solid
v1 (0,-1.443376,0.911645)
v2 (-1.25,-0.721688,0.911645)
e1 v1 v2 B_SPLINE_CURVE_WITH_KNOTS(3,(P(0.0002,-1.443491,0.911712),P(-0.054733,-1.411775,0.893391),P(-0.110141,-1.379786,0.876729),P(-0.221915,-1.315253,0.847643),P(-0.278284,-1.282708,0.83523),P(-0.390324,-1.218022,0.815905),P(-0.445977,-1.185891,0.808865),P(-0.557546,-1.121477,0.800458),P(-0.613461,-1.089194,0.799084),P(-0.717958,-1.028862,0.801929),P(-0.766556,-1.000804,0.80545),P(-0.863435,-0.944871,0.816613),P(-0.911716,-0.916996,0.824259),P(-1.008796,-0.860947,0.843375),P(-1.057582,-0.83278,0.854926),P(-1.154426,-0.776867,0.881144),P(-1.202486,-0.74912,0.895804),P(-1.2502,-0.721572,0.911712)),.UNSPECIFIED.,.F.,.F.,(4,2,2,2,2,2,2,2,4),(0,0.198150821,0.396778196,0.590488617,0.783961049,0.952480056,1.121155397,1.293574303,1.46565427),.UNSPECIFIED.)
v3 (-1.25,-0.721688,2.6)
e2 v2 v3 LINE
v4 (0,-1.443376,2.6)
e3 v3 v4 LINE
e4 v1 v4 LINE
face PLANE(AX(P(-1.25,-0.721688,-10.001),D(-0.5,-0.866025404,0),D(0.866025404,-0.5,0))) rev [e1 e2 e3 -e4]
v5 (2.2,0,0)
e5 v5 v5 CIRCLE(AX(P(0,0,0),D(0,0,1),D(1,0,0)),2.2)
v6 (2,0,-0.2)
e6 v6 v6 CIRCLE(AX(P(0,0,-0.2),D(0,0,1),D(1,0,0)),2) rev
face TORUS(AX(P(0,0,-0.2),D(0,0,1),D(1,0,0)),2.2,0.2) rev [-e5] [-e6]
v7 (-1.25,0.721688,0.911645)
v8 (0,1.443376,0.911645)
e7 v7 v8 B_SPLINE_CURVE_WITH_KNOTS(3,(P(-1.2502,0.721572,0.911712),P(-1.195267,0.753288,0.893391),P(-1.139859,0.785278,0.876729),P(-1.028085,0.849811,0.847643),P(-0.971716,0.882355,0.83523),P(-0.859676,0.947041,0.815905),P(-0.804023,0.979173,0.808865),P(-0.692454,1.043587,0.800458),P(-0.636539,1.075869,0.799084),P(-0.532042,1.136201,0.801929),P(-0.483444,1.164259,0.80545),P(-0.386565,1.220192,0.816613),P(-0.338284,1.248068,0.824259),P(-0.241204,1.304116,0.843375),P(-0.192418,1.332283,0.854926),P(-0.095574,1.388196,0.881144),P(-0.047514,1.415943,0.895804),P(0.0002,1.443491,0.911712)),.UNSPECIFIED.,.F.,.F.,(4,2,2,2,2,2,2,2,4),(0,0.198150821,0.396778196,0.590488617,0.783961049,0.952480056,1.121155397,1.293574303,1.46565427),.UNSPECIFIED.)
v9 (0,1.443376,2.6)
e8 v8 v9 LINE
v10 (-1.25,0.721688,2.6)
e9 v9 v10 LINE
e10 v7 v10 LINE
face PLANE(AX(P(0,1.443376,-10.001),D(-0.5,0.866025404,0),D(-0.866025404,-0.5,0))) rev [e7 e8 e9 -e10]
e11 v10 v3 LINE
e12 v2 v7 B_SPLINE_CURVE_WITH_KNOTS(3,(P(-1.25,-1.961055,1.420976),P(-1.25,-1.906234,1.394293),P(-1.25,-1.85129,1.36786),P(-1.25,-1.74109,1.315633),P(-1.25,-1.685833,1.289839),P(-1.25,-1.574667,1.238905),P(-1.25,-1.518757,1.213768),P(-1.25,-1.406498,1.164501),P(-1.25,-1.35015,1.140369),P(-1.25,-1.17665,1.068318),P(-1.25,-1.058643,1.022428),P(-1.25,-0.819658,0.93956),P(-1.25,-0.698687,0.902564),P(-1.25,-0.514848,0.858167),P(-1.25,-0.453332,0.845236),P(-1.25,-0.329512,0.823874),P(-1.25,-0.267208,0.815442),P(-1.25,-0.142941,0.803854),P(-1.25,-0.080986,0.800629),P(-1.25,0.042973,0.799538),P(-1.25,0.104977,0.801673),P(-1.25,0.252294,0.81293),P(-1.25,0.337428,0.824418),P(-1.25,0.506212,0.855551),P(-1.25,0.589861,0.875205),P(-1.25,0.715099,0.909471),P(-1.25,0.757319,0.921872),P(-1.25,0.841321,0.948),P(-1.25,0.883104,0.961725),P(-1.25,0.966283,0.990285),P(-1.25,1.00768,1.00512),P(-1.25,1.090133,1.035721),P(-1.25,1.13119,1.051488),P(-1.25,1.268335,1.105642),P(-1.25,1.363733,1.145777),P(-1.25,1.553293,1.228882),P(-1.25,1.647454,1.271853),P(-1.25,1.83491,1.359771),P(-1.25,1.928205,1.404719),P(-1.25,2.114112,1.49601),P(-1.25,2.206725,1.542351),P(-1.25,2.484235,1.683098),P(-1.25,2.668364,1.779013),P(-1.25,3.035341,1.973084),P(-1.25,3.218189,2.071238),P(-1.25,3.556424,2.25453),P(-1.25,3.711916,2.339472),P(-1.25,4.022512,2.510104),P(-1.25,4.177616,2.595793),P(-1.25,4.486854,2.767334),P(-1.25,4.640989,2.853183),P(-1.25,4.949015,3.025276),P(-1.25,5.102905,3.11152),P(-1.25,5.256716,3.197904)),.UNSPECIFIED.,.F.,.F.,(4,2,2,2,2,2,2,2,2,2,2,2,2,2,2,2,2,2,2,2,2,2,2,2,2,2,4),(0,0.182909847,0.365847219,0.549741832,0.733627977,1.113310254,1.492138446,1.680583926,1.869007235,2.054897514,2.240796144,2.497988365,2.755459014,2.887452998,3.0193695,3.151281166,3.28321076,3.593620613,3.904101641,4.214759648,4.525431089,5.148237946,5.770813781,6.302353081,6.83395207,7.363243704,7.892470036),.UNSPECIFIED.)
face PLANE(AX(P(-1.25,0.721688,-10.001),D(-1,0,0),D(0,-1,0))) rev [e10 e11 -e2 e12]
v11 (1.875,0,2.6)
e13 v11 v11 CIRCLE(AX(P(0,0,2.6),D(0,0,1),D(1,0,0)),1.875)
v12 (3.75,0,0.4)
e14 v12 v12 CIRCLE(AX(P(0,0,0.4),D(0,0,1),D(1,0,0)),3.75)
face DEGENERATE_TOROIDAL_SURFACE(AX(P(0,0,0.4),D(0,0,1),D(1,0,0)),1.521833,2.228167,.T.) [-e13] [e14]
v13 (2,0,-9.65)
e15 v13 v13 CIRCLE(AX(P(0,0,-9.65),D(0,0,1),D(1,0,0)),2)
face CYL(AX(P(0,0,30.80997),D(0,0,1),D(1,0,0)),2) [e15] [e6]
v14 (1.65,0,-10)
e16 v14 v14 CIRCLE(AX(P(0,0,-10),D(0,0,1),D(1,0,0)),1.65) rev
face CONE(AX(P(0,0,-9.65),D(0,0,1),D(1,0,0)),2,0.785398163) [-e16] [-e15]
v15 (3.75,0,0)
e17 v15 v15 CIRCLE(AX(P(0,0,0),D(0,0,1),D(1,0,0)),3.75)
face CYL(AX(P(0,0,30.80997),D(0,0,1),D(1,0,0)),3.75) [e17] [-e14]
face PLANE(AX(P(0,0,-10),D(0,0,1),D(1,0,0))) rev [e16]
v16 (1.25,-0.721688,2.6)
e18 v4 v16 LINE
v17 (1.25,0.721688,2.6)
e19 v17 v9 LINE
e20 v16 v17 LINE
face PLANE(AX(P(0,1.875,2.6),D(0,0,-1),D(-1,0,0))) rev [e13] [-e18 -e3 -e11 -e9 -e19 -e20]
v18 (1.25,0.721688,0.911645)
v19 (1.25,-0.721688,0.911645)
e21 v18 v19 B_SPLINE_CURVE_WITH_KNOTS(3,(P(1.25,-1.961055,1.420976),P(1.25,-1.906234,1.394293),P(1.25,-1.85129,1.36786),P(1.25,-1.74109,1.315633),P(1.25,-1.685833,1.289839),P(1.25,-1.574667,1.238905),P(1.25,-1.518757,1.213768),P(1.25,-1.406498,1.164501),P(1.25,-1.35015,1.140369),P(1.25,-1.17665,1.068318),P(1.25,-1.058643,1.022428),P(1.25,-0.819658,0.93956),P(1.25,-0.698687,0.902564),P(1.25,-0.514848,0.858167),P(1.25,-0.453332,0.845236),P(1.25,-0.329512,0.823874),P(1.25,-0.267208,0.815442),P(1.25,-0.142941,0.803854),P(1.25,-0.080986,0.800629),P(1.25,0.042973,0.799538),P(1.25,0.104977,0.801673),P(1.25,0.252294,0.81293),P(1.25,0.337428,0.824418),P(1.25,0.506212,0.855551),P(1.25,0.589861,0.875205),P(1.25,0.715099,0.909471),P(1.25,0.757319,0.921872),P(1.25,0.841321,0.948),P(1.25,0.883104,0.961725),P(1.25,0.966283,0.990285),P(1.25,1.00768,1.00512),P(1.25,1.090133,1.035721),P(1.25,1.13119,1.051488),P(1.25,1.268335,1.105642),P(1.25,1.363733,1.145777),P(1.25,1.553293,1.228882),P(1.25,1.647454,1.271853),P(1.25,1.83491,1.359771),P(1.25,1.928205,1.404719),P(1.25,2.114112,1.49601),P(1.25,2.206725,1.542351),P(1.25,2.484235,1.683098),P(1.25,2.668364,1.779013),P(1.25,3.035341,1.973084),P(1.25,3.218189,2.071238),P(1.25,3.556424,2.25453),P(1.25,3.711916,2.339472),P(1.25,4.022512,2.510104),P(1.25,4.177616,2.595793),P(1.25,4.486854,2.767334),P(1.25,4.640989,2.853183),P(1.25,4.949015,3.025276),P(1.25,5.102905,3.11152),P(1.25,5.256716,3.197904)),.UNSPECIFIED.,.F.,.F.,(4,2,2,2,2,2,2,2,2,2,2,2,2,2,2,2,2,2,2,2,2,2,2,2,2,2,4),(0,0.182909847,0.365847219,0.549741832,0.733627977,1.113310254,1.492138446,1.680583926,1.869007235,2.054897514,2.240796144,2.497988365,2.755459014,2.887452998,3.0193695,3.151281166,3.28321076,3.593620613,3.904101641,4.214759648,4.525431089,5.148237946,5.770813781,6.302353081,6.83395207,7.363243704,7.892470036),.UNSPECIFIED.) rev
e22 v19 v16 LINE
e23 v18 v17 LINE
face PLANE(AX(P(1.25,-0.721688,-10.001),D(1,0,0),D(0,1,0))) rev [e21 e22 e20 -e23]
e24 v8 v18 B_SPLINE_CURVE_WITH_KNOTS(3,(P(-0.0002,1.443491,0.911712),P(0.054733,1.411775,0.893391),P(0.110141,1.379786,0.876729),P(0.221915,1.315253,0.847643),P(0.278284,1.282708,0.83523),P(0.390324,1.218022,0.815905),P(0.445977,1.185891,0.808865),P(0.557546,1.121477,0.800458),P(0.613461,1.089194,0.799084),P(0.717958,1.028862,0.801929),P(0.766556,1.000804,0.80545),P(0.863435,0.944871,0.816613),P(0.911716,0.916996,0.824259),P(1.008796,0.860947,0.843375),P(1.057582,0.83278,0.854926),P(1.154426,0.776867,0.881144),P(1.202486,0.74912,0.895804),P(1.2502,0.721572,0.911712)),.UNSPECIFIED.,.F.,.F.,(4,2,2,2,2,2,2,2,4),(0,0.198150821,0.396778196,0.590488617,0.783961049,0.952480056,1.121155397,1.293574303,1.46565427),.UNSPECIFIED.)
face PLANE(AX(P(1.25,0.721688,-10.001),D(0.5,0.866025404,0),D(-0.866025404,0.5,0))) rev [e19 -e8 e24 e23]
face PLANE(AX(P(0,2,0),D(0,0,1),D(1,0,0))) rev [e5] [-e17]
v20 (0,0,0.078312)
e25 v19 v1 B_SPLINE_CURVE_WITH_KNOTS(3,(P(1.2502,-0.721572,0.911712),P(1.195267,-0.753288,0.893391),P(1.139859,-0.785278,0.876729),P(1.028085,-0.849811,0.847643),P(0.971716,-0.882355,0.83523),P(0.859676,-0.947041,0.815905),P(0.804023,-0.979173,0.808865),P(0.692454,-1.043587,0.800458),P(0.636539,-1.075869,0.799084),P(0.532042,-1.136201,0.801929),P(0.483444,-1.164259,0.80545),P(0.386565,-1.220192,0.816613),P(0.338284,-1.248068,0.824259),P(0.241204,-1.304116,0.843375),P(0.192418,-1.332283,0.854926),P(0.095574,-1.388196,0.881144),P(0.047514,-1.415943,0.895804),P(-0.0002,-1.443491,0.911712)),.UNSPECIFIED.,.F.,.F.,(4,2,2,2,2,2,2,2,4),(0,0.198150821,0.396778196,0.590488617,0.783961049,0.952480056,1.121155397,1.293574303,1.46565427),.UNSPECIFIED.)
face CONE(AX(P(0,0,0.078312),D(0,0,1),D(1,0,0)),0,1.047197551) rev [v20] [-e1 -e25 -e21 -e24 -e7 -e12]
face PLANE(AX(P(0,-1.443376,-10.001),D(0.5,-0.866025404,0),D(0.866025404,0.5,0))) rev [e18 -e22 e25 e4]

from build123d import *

# Parameters (mm, degrees)
CHAMFER1_SIZE      = 0.35
CUT_EXTRUDE1_START = -1.8000001
CUT_EXTRUDE1_DEPTH = 2.8000001
FILLET1_R          = 0.2


with BuildPart() as part:
    # Sketch1 → Revolve1 (revolve)
    with BuildSketch(Plane(origin=(0, 0, 0), x_dir=(0, 0, -1), z_dir=(1, 0, 0)), mode=Mode.PRIVATE) as revolve1_sk:
        with BuildLine():
            Line((10, 0), (10, 2))
            Line((10, 2), (0, 2))
            Line((0, 2), (0, 3.75))
            Line((0, 3.75), (-0.4, 3.75))
            ThreePointArc((-0.4, 3.75), (-1.845304899, 3.217657748), (-2.6, 1.875))
            Line((-2.6, 1.875), (-2.6, 0))
            Line((-2.6, 0), (10, 0))
        make_face()
    revolve(revolve1_sk.sketch.rotate(Axis((0, 0, 30.809969789), (0, 0, -1)), 90), axis=Axis((0, 0, 30.809969789), (0, 0, -1)))

    # Chamfer1
    chamfer1_edges = [part.edges().sort_by_distance(p)[0] for p in [
        (-2, 0, -10),
    ]]
    chamfer(chamfer1_edges, length=CHAMFER1_SIZE)

    # Sketch2 → Cut-Revolve1 (revolve, cut)
    with BuildSketch(Plane(origin=(0, 0, 0), x_dir=(0, 0, -1), z_dir=(1, 0, 0)), mode=Mode.PRIVATE) as cut_revolve1_sk:
        Polygon((-2.6, 0), (-2.6, 1.25), (-0.8, 1.25), (-0.078312164, 0), align=None)
    revolve(cut_revolve1_sk.sketch.rotate(Axis((0, 0, 2.452500839), (0, 0, -1)), 90), axis=Axis((0, 0, 2.452500839), (0, 0, -1)), mode=Mode.SUBTRACT)

    # Cut-Extrude1: read off the stored shape, not the designer's step
    # Cut-Extrude1 outline → Cut-Extrude1 (cut)
    with BuildSketch(Plane.XY.offset(2.6).offset(CUT_EXTRUDE1_START)):
        with BuildLine():
            Line((1.25, 0), (1.25, 0.721687836))
            Line((1.25, 0.721687836), (0.625, 1.082531755))
            ThreePointArc((0.625, 1.082531755), (1.082531755, 0.625), (1.25, 0))
        make_face()
        with BuildLine():
            ThreePointArc((-0.625, 1.082531755), (0, 1.25), (0.625, 1.082531755))
            Line((0.625, 1.082531755), (0, 1.443375673))
            Line((0, 1.443375673), (-0.625, 1.082531755))
        make_face()
        with BuildLine():
            Line((1.25, -0.721687836), (1.25, 0))
            ThreePointArc((1.25, 0), (1.082531755, -0.625), (0.625, -1.082531755))
            Line((0.625, -1.082531755), (1.25, -0.721687836))
        make_face()
        with BuildLine():
            ThreePointArc((-1.25, 0), (-1.082531755, 0.625), (-0.625, 1.082531755))
            Line((-0.625, 1.082531755), (-1.25, 0.721687836))
            Line((-1.25, 0.721687836), (-1.25, 0))
        make_face()
        with BuildLine():
            Line((0, -1.443375673), (0.625, -1.082531755))
            ThreePointArc((0.625, -1.082531755), (0, -1.25), (-0.625, -1.082531755))
            Line((-0.625, -1.082531755), (0, -1.443375673))
        make_face()
        with BuildLine():
            ThreePointArc((-0.625, -1.082531755), (-1.082531755, -0.625), (-1.25, 0))
            Line((-1.25, 0), (-1.25, -0.721687836))
            Line((-1.25, -0.721687836), (-0.625, -1.082531755))
        make_face()
    extrude(amount=CUT_EXTRUDE1_DEPTH, mode=Mode.SUBTRACT)

    # Cut-Extrude1 2 outline → Cut-Extrude1 2 (revolve)
    with BuildSketch(Plane.XZ):
        Polygon((1.443375738, 0.911645534), (1.249999957, 0.799999975), (1.443375673, 0.7999999), align=None)
    revolve(axis=Axis((0, 0, 0), (0, 0, 1)))

    # Fillet1
    fillet1_edges = [part.edges().sort_by_distance(p)[0] for p in [
        (-2, 0, 0),
    ]]
    fillet(fillet1_edges, radius=FILLET1_R)


solid = part.part
